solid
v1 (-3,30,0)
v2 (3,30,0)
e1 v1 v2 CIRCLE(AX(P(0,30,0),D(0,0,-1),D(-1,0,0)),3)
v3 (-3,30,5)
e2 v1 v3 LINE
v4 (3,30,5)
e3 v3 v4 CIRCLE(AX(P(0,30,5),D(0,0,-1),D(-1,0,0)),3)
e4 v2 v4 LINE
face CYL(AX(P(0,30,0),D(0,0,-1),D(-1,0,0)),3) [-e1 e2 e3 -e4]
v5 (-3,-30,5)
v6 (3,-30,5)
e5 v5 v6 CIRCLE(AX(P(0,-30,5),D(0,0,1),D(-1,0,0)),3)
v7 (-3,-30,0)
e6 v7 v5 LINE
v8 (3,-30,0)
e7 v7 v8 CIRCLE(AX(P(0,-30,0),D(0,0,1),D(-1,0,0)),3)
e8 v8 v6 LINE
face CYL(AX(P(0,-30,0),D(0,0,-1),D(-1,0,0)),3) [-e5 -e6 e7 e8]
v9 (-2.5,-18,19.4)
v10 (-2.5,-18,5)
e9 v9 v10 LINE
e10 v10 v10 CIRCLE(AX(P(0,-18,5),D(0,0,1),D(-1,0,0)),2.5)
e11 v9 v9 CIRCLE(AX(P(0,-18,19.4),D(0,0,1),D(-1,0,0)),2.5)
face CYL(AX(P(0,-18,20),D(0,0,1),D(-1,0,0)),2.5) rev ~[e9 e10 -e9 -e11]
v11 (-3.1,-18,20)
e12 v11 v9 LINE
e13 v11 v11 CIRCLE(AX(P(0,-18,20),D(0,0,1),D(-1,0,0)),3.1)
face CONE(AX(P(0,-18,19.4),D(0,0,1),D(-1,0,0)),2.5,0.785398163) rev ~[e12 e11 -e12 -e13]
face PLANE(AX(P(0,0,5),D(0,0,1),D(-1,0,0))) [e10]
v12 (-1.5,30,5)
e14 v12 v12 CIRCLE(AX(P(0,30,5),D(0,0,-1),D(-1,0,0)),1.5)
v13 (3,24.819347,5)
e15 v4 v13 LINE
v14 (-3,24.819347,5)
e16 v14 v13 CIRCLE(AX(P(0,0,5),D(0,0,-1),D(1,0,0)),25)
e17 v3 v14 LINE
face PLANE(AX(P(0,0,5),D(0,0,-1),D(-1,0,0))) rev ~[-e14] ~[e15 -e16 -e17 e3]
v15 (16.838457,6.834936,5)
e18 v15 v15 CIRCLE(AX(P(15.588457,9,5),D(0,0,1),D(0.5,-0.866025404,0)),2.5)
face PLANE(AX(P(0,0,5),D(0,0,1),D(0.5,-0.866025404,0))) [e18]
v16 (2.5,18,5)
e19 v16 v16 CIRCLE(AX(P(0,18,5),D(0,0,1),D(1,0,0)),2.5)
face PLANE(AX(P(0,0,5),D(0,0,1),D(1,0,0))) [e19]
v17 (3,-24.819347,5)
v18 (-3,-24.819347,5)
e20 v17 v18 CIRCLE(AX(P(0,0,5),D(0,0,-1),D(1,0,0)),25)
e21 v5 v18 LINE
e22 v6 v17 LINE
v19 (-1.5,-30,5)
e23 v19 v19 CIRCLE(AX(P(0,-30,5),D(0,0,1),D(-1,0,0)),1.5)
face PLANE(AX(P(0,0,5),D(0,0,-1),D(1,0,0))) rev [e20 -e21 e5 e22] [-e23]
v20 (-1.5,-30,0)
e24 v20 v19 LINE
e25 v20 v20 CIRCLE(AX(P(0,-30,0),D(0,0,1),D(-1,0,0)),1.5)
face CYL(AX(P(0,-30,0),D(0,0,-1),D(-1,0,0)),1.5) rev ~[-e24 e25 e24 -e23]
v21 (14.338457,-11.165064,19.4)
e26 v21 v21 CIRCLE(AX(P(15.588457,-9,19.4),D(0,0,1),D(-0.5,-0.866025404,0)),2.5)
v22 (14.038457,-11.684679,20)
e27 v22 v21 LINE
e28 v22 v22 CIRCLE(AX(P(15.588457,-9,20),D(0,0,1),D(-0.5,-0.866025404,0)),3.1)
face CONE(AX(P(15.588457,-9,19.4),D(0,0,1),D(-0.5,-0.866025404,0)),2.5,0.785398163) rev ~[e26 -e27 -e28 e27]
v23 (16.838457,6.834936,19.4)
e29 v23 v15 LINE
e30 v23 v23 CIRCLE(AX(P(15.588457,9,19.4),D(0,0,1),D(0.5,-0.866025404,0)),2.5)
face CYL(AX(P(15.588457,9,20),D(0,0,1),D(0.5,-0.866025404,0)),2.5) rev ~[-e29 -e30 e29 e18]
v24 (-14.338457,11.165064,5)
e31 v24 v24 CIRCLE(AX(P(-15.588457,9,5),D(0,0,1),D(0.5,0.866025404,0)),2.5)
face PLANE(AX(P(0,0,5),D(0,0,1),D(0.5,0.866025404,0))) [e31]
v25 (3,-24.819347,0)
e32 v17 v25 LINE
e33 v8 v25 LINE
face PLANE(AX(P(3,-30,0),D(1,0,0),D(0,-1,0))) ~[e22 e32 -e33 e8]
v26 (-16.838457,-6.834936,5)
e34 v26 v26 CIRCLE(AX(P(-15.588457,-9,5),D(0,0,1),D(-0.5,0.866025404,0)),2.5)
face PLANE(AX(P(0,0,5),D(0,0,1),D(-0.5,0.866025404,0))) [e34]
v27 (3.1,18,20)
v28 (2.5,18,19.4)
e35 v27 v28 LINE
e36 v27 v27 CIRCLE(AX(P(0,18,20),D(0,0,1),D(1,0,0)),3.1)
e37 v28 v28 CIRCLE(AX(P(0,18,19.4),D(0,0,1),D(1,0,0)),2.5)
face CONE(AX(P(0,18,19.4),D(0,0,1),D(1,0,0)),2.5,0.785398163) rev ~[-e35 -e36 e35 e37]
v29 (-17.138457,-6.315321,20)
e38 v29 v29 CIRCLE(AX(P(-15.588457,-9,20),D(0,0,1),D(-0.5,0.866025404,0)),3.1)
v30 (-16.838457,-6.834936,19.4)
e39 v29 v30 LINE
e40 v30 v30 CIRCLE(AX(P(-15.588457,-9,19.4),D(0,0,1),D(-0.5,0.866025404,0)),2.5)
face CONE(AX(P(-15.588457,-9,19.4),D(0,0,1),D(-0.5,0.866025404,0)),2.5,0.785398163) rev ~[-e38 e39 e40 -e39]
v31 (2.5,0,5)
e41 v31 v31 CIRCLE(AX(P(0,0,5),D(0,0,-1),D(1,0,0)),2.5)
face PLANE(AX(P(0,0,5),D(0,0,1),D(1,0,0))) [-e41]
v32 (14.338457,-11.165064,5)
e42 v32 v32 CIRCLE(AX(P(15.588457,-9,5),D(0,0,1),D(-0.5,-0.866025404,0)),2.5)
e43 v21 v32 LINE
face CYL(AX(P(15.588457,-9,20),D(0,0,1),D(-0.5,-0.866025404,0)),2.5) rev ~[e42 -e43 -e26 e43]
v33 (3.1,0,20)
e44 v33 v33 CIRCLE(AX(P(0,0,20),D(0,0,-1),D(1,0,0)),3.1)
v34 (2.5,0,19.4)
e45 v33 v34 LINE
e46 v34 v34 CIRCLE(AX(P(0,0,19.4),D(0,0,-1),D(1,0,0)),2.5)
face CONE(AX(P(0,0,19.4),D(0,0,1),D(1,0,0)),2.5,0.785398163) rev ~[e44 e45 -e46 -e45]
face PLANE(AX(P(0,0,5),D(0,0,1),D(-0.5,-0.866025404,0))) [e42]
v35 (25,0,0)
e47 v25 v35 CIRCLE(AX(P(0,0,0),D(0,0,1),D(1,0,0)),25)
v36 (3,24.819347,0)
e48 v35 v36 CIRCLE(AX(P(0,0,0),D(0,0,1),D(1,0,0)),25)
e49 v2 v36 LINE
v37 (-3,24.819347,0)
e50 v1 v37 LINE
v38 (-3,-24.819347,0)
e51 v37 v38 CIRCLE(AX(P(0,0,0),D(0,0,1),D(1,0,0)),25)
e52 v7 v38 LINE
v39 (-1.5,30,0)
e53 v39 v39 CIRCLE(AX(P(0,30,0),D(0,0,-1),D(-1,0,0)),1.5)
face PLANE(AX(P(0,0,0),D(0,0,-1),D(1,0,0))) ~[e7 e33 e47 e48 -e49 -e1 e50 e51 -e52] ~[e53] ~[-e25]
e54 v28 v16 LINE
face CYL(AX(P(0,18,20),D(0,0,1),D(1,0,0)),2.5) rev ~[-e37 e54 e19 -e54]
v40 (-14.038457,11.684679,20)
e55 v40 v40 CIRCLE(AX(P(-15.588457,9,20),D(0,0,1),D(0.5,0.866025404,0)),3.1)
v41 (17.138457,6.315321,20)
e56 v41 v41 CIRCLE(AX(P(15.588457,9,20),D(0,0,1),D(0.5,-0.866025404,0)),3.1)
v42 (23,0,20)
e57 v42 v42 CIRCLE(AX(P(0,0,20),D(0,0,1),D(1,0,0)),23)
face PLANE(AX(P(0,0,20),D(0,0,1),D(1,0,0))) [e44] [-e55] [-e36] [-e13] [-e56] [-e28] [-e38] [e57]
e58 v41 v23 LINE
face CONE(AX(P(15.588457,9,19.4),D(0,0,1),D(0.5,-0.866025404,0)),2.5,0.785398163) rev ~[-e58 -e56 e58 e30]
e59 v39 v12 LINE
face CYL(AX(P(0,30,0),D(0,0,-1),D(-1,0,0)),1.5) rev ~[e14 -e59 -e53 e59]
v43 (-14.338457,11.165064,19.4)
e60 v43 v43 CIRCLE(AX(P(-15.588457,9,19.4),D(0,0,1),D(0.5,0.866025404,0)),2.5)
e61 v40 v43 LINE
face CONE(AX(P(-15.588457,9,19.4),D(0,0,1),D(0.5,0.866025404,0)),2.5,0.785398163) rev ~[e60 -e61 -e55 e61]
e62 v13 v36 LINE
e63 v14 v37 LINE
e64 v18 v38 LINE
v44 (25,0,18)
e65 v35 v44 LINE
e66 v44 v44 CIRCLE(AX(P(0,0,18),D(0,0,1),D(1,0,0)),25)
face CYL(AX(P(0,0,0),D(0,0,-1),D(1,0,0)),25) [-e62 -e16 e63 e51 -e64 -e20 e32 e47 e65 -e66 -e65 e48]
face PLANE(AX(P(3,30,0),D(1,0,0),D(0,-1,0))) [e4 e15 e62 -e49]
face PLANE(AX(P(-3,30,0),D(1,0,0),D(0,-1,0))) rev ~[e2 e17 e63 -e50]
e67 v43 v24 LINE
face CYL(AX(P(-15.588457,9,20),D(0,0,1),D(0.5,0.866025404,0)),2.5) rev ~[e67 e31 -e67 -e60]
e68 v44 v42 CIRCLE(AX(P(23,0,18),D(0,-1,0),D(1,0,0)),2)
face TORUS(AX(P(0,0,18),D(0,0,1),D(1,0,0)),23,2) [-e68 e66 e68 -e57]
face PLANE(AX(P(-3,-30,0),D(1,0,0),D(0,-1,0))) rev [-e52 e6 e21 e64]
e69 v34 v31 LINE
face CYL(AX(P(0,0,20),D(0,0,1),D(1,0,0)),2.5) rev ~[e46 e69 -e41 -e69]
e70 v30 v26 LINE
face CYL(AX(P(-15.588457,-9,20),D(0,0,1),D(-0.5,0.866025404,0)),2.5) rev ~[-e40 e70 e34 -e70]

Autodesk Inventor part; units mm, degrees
ref_plane "YZ Plane" through (0, 0, 0) normal (1, 0, 0) x (0, 1, 0)
ref_plane "XZ Plane" through (0, 0, 0) normal (0, 1, 0) x (-1, 0, 0)
ref_plane "XY Plane" through (0, 0, 0) normal (0, 0, 1) x (1, 0, 0)
sketch "Esboço1" plane through (0, 0, 0) normal (0, 0, 1) x (1, 0, 0)
  circle A0 centre (0, 0) radius 25
  dimension "d0" = 50
extrude "Extrusão1" add sketch "Esboço1" along normal blind 20
fillet "Arredondamento1" radius 2 1 edges at (-25, 0, 20)
sketch "Esboço2" plane through (0, 0, 20) normal (0, 0, 1) x (1, 0, 0)
  circle A0 centre (0, 0) radius 2.5
  circle A1 centre (0, 18) radius 2.5
  dimension "d4" = 5
  dimension "d5" = 5
  dimension "d6" = 18
extrude "Extrusão2" cut sketch "Esboço2" against normal blind 15
chamfer "Chanfro1" distance 0.6 angle 45 2 edges at (-2.5, 0, 20) (-2.5, 18, 20)
pattern_circular "Padrão circular1" count 6 over 360 about axis through (0, 0, 0) along (0, 0, 1) of "Extrusão2", "Chanfro1"
sketch "Esboço3" plane through (0, 0, 0) normal (0, 0, -1) x (-1, 0, 0)
  arc A0 (3, 30) -> (-3, 30) centre (0, 30) ccw
  circle A1 centre (0, 30) radius 1.5
  line L0 (3, 30) -> (3, 24.3841)
  line L1 (-3, 30) -> (-3, 24.3841)
  line L2 (-3, 24.3841) -> (3, 24.3841)
  point P0 (0, 0)
  dimension "d15" = 6
  dimension "d16" = 3
  dimension "d17" = 30
extrude "Extrusão3" add sketch "Esboço3" against normal blind 5
mirror "Espelhamento1" about plane through (0, 0, 0) normal (0, 1, 0) of "Extrusão3"
sketch "Esboço4" plane through (0, 0, 20) normal (0, 0, 1) x (1, 0, 0)
  circle A0 centre (0, 0) radius 3.1 projected
sketch "Esboço5" plane through (0, 0, 20) normal (0, 0, 1) x (1, 0, 0)
  circle A0 centre (0, 18) radius 3.1 projected
sketch "Esboço6" plane through (0, 0, 20) normal (0, 0, 1) x (1, 0, 0)
  circle A0 centre (15.5885, 9) radius 3.1 projected
sketch "Esboço7" plane through (0, 0, 20) normal (0, 0, 1) x (1, 0, 0)
  circle A0 centre (15.5885, -9) radius 3.1 projected
sketch "Esboço8" plane through (0, 0, 20) normal (0, 0, 1) x (1, 0, 0)
  circle A0 centre (0, -18) radius 3.1 projected
sketch "Esboço9" plane through (0, 0, 20) normal (0, 0, 1) x (1, 0, 0)
  circle A0 centre (-15.5885, -9) radius 3.1 projected
sketch "Esboço10" plane through (0, 0, 20) normal (0, 0, 1) x (1, 0, 0)
  circle A0 centre (-15.5885, 9) radius 3.1 projected
properties part number "Conector2"
